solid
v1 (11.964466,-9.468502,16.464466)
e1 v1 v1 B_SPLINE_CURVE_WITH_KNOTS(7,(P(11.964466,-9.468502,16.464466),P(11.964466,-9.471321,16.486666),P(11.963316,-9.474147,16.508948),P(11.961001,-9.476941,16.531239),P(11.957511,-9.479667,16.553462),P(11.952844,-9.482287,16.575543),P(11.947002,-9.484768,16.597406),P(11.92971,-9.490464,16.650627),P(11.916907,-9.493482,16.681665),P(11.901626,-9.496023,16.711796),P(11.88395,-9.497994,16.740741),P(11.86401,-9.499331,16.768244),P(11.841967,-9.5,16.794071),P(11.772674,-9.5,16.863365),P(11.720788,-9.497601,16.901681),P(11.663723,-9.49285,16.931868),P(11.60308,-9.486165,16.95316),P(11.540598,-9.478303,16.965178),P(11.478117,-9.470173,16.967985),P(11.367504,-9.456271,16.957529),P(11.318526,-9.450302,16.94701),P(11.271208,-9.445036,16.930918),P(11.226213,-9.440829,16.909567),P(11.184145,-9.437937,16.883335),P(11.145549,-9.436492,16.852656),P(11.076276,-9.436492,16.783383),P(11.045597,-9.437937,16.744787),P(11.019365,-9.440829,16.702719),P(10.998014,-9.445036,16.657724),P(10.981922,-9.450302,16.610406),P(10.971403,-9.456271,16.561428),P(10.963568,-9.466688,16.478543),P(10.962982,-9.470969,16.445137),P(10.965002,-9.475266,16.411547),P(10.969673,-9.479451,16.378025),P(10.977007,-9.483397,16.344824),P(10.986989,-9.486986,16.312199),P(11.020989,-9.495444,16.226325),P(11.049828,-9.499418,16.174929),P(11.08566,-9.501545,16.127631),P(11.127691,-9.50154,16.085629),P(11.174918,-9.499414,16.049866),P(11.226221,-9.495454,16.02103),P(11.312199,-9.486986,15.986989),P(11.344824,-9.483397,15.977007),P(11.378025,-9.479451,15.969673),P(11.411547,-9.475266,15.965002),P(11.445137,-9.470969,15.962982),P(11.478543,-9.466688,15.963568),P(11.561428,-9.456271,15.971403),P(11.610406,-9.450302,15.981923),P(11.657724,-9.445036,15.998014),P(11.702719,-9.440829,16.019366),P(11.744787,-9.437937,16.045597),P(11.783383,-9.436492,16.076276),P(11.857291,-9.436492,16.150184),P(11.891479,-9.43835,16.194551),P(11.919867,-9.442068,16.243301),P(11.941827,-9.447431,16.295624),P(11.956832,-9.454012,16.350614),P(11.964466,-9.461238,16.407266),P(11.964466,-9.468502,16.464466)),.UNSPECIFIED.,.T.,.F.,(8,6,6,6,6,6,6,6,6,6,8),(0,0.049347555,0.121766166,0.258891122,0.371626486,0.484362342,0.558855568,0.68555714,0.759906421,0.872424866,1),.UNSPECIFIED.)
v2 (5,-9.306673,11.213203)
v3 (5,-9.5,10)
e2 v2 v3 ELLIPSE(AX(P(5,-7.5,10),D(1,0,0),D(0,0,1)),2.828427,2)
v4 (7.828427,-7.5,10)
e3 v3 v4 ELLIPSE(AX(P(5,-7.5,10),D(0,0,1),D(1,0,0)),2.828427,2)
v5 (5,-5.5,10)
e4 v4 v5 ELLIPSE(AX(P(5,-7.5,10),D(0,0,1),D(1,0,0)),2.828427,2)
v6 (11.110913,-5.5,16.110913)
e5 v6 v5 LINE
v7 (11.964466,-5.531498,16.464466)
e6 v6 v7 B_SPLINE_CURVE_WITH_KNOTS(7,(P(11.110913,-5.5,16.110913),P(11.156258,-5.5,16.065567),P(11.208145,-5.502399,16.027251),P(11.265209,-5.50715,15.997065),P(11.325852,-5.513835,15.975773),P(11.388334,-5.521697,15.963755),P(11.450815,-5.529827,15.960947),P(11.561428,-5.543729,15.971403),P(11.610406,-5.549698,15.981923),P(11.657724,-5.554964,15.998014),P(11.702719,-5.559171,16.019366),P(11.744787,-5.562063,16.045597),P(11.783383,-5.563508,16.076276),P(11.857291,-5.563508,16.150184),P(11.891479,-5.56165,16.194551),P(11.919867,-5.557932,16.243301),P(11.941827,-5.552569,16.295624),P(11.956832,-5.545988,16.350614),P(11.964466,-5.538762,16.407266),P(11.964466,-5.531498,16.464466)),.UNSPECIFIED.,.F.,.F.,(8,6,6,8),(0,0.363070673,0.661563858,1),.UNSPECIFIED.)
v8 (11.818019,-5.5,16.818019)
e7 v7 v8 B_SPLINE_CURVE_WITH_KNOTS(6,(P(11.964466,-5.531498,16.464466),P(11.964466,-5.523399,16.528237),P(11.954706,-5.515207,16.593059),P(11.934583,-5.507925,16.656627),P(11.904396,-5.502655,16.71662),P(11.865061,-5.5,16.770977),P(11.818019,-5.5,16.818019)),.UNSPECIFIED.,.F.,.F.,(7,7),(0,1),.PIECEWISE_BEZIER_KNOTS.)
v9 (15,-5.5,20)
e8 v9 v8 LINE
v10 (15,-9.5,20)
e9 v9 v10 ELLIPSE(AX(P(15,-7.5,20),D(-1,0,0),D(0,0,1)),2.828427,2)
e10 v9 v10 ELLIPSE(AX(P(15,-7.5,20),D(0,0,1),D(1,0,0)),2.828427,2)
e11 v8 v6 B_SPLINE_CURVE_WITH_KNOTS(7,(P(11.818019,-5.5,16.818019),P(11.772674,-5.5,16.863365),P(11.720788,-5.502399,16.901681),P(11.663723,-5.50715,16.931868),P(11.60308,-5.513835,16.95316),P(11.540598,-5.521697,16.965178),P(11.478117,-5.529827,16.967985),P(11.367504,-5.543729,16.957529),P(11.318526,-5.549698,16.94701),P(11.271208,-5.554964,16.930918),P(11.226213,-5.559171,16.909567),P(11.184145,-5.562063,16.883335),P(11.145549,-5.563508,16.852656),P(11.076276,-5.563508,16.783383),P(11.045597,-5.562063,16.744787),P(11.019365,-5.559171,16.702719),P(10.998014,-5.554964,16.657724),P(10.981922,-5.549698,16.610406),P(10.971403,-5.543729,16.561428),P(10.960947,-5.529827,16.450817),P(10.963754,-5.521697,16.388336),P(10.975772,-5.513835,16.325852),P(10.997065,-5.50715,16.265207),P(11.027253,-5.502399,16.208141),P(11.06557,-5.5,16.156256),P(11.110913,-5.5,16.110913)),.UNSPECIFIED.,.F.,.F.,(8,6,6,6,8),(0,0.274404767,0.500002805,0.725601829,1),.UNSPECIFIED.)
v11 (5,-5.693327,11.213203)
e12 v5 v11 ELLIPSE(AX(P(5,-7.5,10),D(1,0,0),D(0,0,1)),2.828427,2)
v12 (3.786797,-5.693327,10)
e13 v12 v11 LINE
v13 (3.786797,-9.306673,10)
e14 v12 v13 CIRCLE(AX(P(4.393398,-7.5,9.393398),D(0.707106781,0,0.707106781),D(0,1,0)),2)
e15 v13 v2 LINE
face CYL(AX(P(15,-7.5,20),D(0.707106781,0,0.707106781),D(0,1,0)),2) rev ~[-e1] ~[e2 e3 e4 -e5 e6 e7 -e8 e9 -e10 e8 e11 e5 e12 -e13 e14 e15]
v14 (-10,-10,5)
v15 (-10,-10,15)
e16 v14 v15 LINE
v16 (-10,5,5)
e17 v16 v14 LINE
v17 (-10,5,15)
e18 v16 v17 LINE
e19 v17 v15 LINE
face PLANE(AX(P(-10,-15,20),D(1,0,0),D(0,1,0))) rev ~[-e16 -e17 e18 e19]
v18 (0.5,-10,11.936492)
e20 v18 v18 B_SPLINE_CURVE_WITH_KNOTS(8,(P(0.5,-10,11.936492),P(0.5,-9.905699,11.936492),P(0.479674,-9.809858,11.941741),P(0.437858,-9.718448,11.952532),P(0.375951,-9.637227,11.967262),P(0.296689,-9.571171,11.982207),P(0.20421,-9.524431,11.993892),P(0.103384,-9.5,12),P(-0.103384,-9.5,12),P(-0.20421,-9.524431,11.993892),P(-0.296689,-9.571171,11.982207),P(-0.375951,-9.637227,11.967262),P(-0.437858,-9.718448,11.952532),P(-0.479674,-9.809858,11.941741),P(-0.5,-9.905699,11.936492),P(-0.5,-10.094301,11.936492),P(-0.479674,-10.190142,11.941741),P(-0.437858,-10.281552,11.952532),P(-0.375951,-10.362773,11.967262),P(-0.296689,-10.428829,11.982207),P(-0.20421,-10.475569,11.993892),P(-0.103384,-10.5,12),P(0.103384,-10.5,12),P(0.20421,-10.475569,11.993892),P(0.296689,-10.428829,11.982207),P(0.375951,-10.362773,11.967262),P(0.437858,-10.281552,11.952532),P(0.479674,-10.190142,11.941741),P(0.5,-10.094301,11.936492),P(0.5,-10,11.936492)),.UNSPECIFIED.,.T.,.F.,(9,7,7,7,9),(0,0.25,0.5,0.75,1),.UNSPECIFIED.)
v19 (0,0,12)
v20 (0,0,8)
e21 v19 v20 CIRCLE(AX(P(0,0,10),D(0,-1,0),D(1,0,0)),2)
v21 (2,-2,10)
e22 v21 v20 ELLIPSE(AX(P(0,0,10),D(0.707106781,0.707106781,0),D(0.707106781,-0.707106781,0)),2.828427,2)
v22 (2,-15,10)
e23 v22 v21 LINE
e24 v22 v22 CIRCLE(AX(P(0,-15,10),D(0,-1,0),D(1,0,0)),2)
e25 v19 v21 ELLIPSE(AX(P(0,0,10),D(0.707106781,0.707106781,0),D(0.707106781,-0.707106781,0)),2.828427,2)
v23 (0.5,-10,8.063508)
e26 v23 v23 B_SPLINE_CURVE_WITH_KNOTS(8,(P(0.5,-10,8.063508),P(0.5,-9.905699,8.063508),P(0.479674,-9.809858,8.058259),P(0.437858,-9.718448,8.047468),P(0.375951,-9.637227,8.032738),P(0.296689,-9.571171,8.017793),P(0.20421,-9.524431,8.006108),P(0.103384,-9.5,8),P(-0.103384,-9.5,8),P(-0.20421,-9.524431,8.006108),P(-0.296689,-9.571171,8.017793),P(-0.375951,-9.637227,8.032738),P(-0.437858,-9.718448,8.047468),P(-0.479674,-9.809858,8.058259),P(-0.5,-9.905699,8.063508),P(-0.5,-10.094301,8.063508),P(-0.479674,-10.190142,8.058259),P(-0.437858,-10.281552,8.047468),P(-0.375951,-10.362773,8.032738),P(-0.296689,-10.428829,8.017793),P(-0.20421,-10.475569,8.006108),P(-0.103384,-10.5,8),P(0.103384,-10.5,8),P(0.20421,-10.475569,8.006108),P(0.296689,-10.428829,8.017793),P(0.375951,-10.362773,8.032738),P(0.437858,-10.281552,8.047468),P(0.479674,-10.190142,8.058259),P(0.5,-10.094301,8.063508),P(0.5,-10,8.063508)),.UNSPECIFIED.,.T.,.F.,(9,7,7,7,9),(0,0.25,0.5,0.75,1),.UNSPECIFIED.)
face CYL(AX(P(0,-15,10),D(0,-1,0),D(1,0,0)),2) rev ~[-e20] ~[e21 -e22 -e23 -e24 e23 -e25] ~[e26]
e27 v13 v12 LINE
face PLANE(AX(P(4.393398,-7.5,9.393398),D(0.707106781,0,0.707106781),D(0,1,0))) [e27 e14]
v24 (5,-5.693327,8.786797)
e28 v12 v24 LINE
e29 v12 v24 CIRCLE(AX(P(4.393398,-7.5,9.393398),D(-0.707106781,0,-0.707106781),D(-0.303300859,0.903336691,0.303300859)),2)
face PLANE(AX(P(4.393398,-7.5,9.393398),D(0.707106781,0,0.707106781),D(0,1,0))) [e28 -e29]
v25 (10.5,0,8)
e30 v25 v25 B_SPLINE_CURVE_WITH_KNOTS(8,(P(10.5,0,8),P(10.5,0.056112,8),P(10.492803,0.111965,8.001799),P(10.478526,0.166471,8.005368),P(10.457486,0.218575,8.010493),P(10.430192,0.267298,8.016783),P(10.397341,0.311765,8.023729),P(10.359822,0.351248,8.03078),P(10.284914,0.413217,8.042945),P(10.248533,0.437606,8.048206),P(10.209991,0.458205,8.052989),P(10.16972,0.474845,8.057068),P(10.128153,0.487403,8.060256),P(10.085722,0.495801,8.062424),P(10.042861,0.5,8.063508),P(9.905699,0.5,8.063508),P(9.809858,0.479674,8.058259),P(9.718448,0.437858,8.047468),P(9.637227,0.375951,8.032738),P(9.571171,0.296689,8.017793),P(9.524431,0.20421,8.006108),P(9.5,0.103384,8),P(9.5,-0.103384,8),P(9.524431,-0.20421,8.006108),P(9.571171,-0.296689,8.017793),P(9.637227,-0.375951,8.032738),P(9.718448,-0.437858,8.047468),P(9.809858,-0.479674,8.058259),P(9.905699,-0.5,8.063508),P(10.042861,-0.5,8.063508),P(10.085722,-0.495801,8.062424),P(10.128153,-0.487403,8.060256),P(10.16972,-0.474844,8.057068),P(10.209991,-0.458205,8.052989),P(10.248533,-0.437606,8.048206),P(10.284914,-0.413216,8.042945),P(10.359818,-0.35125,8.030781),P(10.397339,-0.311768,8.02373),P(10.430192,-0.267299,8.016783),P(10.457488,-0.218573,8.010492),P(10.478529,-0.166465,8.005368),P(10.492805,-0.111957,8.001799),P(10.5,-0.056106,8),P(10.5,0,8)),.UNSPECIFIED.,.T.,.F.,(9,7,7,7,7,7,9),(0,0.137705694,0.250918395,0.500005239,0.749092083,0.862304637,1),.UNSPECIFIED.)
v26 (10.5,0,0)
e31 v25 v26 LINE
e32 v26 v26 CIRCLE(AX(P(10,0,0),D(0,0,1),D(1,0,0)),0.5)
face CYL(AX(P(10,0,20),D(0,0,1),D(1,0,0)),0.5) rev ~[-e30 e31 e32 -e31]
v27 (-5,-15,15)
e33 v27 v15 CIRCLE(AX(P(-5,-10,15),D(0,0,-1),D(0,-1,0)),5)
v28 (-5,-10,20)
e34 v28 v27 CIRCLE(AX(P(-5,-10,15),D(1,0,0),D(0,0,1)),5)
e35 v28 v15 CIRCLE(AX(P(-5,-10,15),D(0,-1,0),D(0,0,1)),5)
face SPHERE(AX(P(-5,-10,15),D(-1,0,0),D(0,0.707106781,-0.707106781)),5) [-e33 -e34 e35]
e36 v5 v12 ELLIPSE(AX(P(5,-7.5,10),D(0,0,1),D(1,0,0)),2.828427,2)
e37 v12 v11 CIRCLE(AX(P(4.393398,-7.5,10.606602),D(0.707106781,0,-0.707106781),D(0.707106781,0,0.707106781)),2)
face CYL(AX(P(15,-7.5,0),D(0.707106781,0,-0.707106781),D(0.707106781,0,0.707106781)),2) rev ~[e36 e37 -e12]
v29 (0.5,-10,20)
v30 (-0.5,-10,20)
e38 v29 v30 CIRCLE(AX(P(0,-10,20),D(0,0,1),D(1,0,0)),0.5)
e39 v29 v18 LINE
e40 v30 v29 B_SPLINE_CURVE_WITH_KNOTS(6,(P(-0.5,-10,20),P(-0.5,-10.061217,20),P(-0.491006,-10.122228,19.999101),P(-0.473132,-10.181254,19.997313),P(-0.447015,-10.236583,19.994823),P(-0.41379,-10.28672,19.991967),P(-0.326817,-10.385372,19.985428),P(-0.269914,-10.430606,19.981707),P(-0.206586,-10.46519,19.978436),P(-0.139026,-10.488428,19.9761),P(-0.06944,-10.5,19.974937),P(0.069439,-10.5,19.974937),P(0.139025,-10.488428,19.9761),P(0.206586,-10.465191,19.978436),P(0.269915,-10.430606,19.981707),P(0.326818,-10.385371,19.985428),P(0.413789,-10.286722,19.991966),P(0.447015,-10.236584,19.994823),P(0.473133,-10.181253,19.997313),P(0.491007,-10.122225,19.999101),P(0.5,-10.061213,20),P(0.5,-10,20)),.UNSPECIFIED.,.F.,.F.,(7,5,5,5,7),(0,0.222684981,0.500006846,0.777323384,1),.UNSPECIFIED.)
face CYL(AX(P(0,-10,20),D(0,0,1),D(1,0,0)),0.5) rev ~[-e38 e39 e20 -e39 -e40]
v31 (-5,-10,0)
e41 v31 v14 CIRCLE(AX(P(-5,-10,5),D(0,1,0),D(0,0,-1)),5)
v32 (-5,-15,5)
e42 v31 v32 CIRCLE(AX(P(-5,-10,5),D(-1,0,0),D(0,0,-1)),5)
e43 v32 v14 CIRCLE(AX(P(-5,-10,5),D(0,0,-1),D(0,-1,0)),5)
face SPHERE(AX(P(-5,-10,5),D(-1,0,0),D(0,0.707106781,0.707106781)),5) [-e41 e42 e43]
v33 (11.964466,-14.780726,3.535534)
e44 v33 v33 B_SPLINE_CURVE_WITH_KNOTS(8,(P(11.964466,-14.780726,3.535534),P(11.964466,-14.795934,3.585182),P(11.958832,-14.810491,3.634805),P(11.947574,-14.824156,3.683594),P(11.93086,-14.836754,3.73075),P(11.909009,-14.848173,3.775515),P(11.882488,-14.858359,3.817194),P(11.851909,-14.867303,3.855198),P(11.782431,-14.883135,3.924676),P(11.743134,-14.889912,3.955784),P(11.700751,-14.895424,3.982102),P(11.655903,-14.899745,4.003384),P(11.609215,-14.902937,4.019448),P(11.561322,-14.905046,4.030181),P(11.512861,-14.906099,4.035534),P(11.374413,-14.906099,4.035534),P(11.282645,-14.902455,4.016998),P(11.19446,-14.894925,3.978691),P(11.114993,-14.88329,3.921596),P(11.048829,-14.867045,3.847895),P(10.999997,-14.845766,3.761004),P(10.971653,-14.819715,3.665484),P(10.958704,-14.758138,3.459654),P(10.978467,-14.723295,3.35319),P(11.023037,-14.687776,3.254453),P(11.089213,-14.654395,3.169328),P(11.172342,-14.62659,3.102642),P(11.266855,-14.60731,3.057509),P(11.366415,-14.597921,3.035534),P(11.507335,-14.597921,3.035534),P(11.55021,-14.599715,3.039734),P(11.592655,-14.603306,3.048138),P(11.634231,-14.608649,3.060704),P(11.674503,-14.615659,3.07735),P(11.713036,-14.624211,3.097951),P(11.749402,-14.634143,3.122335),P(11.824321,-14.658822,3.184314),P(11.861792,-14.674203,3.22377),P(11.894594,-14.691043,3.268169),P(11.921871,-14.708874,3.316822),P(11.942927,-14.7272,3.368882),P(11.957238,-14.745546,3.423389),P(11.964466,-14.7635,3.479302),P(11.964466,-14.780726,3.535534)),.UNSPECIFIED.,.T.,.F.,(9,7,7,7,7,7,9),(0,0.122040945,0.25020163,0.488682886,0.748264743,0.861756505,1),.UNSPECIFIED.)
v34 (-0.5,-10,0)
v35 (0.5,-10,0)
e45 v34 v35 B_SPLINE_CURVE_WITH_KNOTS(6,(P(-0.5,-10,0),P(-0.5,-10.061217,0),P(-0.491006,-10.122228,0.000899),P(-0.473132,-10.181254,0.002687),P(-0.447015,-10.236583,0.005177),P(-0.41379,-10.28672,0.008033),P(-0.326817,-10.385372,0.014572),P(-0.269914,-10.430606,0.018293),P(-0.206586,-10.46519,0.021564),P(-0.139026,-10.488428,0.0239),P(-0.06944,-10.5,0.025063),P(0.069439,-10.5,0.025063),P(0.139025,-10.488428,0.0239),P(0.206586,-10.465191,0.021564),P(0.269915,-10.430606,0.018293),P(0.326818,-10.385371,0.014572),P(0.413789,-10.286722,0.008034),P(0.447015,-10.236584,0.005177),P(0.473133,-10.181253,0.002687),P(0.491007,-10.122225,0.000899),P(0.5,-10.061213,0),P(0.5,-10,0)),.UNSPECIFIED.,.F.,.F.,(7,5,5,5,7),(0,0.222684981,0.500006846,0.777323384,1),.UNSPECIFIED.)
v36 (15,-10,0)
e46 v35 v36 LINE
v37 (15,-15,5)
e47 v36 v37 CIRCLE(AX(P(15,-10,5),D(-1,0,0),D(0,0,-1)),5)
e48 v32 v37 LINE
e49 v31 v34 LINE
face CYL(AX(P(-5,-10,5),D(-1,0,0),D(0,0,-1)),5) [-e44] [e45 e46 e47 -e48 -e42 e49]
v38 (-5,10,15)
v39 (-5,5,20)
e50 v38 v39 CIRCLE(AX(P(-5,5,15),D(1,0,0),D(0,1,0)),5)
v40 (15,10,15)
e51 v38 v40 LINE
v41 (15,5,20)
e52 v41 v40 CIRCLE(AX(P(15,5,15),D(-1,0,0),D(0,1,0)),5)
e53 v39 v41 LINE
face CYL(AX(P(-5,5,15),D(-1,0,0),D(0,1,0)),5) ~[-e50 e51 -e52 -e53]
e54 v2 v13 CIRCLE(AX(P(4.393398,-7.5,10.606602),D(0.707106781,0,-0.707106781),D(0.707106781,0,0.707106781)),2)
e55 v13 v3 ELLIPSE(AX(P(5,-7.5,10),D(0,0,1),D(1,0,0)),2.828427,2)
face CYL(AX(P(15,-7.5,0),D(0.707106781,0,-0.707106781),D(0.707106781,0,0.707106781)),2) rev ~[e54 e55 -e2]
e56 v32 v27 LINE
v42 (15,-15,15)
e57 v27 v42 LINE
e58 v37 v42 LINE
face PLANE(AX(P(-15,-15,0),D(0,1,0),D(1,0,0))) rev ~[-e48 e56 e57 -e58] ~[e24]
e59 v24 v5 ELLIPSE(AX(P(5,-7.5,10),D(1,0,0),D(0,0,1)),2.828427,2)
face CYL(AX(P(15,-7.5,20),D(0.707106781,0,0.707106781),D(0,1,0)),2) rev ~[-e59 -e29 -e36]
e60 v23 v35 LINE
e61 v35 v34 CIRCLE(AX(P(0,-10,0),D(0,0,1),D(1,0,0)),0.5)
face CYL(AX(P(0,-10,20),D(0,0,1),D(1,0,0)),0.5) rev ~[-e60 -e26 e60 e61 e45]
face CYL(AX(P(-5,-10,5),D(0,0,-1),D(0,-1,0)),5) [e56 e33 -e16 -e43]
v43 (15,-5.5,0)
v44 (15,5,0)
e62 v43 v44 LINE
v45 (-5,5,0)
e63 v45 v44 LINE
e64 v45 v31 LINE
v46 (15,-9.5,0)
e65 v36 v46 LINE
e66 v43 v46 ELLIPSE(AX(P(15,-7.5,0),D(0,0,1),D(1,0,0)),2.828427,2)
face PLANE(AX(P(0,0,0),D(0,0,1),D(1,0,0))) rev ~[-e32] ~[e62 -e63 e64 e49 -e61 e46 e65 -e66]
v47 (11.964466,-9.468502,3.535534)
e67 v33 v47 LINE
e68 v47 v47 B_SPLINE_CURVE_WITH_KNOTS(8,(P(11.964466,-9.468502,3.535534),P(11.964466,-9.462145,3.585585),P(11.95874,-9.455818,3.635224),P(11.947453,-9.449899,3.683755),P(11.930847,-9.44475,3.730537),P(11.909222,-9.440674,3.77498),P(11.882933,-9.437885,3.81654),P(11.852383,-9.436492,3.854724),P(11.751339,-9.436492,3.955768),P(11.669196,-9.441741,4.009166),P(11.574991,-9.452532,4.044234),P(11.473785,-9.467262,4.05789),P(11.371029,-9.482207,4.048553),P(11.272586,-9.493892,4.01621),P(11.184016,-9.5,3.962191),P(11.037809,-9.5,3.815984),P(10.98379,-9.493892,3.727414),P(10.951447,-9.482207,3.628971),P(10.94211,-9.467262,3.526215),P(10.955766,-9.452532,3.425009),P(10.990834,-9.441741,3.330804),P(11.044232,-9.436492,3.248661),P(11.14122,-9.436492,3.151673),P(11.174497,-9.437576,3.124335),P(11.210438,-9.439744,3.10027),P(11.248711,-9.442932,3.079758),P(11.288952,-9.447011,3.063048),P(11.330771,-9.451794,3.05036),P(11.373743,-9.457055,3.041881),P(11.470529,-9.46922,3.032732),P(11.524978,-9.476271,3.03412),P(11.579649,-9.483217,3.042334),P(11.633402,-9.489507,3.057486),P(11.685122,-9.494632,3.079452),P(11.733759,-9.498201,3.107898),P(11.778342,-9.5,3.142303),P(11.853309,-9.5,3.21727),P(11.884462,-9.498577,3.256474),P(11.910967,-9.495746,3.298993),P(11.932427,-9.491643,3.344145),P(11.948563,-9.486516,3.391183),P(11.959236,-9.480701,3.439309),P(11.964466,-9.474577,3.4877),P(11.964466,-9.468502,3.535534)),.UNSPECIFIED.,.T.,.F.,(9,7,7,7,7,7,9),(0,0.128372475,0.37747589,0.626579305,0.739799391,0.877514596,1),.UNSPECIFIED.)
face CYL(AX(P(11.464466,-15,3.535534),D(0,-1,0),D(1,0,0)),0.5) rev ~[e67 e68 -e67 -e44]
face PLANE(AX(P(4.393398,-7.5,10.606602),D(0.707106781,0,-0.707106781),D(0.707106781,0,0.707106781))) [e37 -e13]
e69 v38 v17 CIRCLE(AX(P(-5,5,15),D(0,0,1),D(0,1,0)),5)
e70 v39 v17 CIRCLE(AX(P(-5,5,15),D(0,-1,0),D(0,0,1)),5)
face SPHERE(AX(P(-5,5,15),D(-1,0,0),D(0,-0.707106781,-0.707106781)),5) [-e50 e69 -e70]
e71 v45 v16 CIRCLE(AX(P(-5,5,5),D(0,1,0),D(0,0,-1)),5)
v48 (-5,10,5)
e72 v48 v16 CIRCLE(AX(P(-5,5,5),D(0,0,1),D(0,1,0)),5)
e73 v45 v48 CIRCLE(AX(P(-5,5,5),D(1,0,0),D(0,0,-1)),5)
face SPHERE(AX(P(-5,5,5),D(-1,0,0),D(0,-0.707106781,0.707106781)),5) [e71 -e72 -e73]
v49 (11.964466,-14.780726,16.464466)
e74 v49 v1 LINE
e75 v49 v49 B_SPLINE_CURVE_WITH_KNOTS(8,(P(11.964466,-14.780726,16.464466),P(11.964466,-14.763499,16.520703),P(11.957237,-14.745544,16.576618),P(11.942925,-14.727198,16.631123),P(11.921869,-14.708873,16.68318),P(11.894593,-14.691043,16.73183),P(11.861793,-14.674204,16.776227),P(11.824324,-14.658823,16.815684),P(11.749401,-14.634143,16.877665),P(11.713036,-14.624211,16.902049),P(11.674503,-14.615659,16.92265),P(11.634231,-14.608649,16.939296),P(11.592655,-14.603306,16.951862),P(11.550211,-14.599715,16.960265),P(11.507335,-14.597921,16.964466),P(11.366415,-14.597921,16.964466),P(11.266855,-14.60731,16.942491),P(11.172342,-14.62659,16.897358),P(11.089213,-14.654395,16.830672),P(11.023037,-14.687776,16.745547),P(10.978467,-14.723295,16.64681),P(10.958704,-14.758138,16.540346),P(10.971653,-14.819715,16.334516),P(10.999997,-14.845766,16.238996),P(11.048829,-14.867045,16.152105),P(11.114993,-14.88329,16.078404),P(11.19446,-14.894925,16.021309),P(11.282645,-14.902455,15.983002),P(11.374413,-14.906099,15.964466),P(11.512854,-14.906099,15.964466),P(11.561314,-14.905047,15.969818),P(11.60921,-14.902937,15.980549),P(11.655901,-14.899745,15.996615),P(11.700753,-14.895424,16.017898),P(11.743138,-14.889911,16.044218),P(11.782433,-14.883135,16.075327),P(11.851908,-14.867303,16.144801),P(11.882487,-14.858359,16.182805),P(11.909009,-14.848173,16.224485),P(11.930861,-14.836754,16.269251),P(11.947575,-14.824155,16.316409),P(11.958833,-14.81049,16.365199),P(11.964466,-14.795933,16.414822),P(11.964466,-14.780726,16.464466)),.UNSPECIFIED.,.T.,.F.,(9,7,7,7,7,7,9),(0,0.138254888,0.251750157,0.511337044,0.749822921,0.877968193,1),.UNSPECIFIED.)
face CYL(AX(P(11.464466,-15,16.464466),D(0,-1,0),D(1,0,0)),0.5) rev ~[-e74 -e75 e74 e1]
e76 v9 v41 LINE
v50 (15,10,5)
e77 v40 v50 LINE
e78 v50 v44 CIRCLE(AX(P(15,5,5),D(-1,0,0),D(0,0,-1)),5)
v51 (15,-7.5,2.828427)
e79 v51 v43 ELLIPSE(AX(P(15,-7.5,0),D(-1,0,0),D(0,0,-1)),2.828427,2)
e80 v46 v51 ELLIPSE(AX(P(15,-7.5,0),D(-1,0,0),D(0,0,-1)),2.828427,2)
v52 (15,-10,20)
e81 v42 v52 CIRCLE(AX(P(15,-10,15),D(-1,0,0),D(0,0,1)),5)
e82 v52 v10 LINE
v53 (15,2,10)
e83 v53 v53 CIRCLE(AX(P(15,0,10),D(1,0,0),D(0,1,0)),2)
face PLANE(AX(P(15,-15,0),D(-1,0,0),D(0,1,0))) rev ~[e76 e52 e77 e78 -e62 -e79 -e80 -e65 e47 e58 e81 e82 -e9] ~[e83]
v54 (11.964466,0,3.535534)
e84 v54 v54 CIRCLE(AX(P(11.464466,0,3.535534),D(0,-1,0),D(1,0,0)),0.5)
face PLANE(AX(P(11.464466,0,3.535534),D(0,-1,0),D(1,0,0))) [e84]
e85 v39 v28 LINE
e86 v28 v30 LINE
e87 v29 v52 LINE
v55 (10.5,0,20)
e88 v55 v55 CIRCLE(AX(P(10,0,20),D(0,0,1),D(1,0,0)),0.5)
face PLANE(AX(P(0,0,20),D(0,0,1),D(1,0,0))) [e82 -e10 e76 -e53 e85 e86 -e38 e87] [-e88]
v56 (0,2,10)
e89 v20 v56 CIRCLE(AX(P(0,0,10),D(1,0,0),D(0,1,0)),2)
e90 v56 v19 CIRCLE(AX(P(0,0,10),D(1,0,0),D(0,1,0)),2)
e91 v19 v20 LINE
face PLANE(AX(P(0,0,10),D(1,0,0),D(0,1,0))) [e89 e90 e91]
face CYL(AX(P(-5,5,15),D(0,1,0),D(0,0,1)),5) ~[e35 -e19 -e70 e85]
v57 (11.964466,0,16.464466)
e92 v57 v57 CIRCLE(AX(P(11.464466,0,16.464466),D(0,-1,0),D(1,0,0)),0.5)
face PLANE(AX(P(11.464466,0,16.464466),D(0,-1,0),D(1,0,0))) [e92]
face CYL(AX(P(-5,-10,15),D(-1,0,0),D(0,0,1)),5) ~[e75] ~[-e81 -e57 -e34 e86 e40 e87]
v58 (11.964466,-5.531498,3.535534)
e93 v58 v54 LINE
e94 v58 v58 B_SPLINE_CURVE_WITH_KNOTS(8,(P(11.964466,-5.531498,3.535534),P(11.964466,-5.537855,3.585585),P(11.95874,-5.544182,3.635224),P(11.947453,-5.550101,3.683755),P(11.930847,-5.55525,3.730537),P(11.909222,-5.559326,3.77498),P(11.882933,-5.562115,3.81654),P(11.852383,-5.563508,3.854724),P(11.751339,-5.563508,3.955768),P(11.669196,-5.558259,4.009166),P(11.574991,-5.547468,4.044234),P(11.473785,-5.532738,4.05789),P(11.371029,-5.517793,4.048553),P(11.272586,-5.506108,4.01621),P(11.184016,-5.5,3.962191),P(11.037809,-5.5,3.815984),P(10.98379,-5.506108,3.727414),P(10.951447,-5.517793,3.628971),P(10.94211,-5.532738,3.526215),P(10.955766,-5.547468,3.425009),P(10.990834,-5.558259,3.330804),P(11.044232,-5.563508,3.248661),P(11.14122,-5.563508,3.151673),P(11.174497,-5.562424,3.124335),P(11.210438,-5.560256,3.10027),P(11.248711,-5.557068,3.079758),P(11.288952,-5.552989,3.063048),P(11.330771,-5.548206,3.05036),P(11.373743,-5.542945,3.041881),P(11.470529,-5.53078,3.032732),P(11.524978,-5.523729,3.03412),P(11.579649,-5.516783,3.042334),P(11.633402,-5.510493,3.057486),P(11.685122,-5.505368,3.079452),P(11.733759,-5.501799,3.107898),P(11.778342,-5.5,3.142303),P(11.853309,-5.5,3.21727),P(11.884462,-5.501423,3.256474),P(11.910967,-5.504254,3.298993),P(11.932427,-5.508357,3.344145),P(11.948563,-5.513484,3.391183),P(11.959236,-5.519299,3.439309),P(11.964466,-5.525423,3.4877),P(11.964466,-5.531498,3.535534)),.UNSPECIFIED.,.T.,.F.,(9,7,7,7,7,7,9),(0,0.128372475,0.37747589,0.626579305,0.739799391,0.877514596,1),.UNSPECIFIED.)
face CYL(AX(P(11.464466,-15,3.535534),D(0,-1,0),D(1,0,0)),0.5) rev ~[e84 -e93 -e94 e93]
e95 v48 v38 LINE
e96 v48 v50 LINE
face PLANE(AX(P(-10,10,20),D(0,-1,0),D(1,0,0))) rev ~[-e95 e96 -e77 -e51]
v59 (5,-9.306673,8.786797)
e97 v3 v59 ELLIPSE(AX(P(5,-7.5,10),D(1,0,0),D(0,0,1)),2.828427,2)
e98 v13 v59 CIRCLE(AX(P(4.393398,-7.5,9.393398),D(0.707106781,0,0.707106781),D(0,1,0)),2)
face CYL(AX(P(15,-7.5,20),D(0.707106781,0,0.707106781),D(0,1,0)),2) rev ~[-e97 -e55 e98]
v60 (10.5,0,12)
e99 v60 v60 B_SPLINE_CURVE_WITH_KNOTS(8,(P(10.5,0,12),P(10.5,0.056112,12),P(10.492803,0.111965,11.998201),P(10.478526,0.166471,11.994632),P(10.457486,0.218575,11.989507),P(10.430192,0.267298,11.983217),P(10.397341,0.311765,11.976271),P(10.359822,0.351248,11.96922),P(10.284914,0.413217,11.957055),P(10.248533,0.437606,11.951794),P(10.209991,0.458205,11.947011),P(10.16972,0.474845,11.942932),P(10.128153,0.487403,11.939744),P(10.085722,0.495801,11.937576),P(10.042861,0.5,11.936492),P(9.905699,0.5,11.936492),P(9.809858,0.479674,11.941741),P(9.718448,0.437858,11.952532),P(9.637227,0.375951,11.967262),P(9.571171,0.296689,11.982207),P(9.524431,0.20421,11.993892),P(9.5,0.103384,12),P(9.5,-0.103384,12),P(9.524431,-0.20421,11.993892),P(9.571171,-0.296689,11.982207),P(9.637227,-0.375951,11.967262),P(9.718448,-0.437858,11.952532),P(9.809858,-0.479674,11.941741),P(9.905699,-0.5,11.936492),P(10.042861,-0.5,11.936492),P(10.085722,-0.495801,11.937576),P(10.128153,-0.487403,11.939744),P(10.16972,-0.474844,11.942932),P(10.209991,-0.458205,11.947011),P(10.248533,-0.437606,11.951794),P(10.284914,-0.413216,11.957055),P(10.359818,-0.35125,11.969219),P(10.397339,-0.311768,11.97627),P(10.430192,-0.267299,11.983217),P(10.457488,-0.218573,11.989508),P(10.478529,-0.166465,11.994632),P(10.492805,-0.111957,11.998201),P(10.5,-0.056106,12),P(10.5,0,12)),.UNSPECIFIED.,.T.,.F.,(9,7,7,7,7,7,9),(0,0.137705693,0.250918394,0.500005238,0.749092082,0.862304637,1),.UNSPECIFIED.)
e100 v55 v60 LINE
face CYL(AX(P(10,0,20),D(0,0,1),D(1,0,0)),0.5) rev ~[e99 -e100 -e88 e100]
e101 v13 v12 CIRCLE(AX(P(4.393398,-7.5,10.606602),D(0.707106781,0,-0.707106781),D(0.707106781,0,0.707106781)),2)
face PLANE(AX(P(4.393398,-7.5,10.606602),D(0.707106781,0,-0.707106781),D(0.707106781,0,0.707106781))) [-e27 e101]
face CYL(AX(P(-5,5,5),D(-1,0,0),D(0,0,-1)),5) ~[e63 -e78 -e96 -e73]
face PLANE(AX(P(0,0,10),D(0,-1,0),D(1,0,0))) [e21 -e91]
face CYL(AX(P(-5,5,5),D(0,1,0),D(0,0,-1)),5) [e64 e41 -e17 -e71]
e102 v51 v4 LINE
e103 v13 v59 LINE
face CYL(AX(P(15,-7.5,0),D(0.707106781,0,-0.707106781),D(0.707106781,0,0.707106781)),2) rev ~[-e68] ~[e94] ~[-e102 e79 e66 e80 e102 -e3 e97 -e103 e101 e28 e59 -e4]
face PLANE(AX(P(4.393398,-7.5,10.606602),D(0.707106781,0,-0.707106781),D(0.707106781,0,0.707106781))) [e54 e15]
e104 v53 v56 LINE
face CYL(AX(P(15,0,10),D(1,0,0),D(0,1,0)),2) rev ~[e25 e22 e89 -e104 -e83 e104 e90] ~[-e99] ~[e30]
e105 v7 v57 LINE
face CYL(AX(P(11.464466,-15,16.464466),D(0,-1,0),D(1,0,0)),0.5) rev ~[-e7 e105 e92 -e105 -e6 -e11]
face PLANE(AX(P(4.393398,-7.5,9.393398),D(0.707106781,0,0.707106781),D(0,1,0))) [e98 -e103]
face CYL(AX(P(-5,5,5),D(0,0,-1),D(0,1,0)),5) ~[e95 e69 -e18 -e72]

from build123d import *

# Parameters (mm, degrees)
F0_W          = 30
F0_H          = 30
F1_DEPTH      = 20
F2_R          = 2
F3_DEPTH      = 15
F4_R          = 2
F4_R_2        = 0.5
F5_DEPTH      = 15
F7_R          = 2
F8_DEPTH      = 15
F10_R         = 2
F11_DEPTH     = 15
F12_R         = 0.5
F13_DEPTH     = 20.0010001
F14_T1_DEPTH  = 10
F14_T3_DEPTH  = 32.5
F14_T5_DEPTH  = 15
F14_S9_W      = 5
F14_S9_H      = 5
F14_T10_DEPTH = 5
F14_S15_W     = 5
F14_S15_H     = 5
F14_T16_DEPTH = 5
F14_S21_W     = 5
F14_S21_H     = 5
F14_T22_DEPTH = 5
F14_S27_W     = 5
F14_S27_H     = 5
F14_T28_DEPTH = 5


# Not quite as in the source:
# - a fillet or chamfer that OpenCascade refuses, or shapes differently, is made with other operations: its cross-section is extruded or revolved along the edge and cut away or added


with BuildPart() as f1:
    # F0 (on Top) → F1 (new body)
    with BuildSketch(Plane.XY):
        Rectangle(F0_W, F0_H)
    extrude(amount=F1_DEPTH)

    # F2 (on face) → F3 (cut)
    with BuildSketch(Plane.YZ.offset(15)):
        with Locations((0, 10)):
            Circle(F2_R)
    extrude(amount=-F3_DEPTH, mode=Mode.SUBTRACT)

    # F4 (on face) → F5 (cut)
    with BuildSketch(Plane.XZ.offset(15)):
        with Locations((0, 10)):
            Circle(F4_R)
        with Locations((11.4644660941, 16.4644660941)):
            Circle(F4_R_2)
        with Locations((11.4644660941, 3.5355339059)):
            Circle(F4_R_2)
    extrude(amount=-F5_DEPTH, mode=Mode.SUBTRACT)

    # F7 (on face) → F8 (cut)
    with BuildSketch(Plane(origin=(17.5, 0, 17.5), x_dir=(0, 1, 0), z_dir=(0.7071067812, 0, 0.7071067812))):
        with Locations((-7.5, 3.5355339059)):
            Circle(F7_R)
    extrude(amount=-F8_DEPTH, mode=Mode.SUBTRACT)

    # F10 (on face) → F11 (cut)
    with BuildSketch(Plane(origin=(7.5, 0, -7.5), x_dir=(0.7071067812, 0, 0.7071067812), z_dir=(0.7071067812, 0, -0.7071067812))):
        with Locations((10.6066017178, 7.5)):
            Circle(F10_R)
    extrude(amount=-F11_DEPTH, mode=Mode.SUBTRACT)

    # F12 (on face) → F13 (cut, through all)
    with BuildSketch(Plane.XY.offset(20)):
        Polygon((-60, -15), (-10, -15), (-10, 10), (15, 10), (15, 50), (-60, 50), align=None)
        with Locations((10, 0)):
            Circle(F12_R)
        with Locations((0, -10)):
            Circle(F12_R)
    extrude(amount=-F13_DEPTH, mode=Mode.SUBTRACT)

    # F14: fillet of radius 5 on 8 edges, made by hand

    # F14_s2 → F14_t1 (cut)
    with BuildSketch(Plane.XY.offset(5)):
        with BuildLine():
            ThreePointArc((-5, -15), (-8.5355339059, -13.5355339059), (-10, -10))
            Line((-10, -10), (-10, -15))
            Line((-10, -15), (-5, -15))
        make_face()
        with BuildLine():
            ThreePointArc((-5, 10), (-8.5355339059, 8.5355339059), (-10, 5))
            Line((-10, 5), (-10, 10))
            Line((-10, 10), (-5, 10))
        make_face()
    extrude(amount=F14_T1_DEPTH, mode=Mode.SUBTRACT)

    # F14_s4 → F14_t3 (cut)
    with BuildSketch(Plane.YZ.offset(-5)):
        with BuildLine():
            ThreePointArc((-10, 20), (-13.5355339059, 18.5355339059), (-15, 15))
            Line((-15, 15), (-15, 20))
            Line((-15, 20), (-10, 20))
        make_face()
        with BuildLine():
            ThreePointArc((10, 15), (8.5355339059, 18.5355339059), (5, 20))
            Line((5, 20), (10, 20))
            Line((10, 20), (10, 15))
        make_face()
        with BuildLine():
            ThreePointArc((5, 0), (8.5355339059, 1.4644660941), (10, 5))
            Line((10, 5), (10, 0))
            Line((10, 0), (5, 0))
        make_face()
        with BuildLine():
            ThreePointArc((-10, 0), (-13.5355339059, 1.4644660941), (-15, 5))
            Line((-15, 5), (-15, 0))
            Line((-15, 0), (-10, 0))
        make_face()
    extrude(amount=F14_T3_DEPTH, mode=Mode.SUBTRACT)

    # F14_s6 → F14_t5 (cut)
    with BuildSketch(Plane.XZ.offset(-5)):
        with BuildLine():
            ThreePointArc((-5, 20), (-8.5355339059, 18.5355339059), (-10, 15))
            Line((-10, 15), (-10, 20))
            Line((-10, 20), (-5, 20))
        make_face()
        with BuildLine():
            ThreePointArc((-5, 0), (-8.5355339059, 1.4644660941), (-10, 5))
            Line((-10, 5), (-10, 0))
            Line((-10, 0), (-5, 0))
        make_face()
    extrude(amount=F14_T5_DEPTH, mode=Mode.SUBTRACT)


with BuildPart() as f14_tool8:
    # F14_s9 → F14_t10 (new body)
    with BuildSketch(Plane.YZ.offset(-5)):
        with Locations((-12.5, 17.5)):
            Rectangle(F14_S9_W, F14_S9_H)
    extrude(amount=-F14_T10_DEPTH)

    # F14_s11 → F14_t12 (revolve, cut)
    with BuildSketch(Plane(origin=(-5, -10, 15), x_dir=(0, 0.7071067812, -0.7071067812), z_dir=(0, 0.7071067812, 0.7071067812))):
        with BuildLine():
            ThreePointArc((0, -5), (5, 0), (0, 5))
            Line((0, 5), (0, -5))
        make_face()
    revolve(axis=Axis((-5, -10, 15), (-1, 0, 0)), mode=Mode.SUBTRACT)


with BuildPart() as f1_1:
    add(f1.part)

    # F14_t7: cut F14_tool8
    add(f14_tool8.part, mode=Mode.SUBTRACT)


with BuildPart() as f14_tool14:
    # F14_s15 → F14_t16 (new body)
    with BuildSketch(Plane.YZ.offset(-5)):
        with Locations((-12.5, 2.5)):
            Rectangle(F14_S15_W, F14_S15_H)
    extrude(amount=-F14_T16_DEPTH)

    # F14_s17 → F14_t18 (revolve, cut)
    with BuildSketch(Plane(origin=(-5, -10, 5), x_dir=(0, 0.7071067812, 0.7071067812), z_dir=(0, -0.7071067812, 0.7071067812))):
        with BuildLine():
            ThreePointArc((0, -5), (5, 0), (0, 5))
            Line((0, 5), (0, -5))
        make_face()
    revolve(axis=Axis((-5, -10, 5), (-1, 0, 0)), mode=Mode.SUBTRACT)


with BuildPart() as f1_2:
    add(f1_1.part)

    # F14_t13: cut F14_tool14
    add(f14_tool14.part, mode=Mode.SUBTRACT)


with BuildPart() as f14_tool20:
    # F14_s21 → F14_t22 (new body)
    with BuildSketch(Plane.YZ.offset(-5)):
        with Locations((7.5, 17.5)):
            Rectangle(F14_S21_W, F14_S21_H)
    extrude(amount=-F14_T22_DEPTH)

    # F14_s23 → F14_t24 (revolve, cut)
    with BuildSketch(Plane(origin=(-5, 5, 15), x_dir=(0, -0.7071067812, -0.7071067812), z_dir=(0, 0.7071067812, -0.7071067812))):
        with BuildLine():
            ThreePointArc((0, -5), (5, 0), (0, 5))
            Line((0, 5), (0, -5))
        make_face()
    revolve(axis=Axis((-5, 5, 15), (-1, 0, 0)), mode=Mode.SUBTRACT)


with BuildPart() as f1_3:
    add(f1_2.part)

    # F14_t19: cut F14_tool20
    add(f14_tool20.part, mode=Mode.SUBTRACT)


with BuildPart() as f14_tool26:
    # F14_s27 → F14_t28 (new body)
    with BuildSketch(Plane.YZ.offset(-5)):
        with Locations((7.5, 2.5)):
            Rectangle(F14_S27_W, F14_S27_H)
    extrude(amount=-F14_T28_DEPTH)

    # F14_s29 → F14_t30 (revolve, cut)
    with BuildSketch(Plane(origin=(-5, 5, 5), x_dir=(0, -0.7071067812, 0.7071067812), z_dir=(0, -0.7071067812, -0.7071067812))):
        with BuildLine():
            ThreePointArc((0, -5), (5, 0), (0, 5))
            Line((0, 5), (0, -5))
        make_face()
    revolve(axis=Axis((-5, 5, 5), (-1, 0, 0)), mode=Mode.SUBTRACT)


with BuildPart() as f1_4:
    add(f1_3.part)

    # F14_t25: cut F14_tool26
    add(f14_tool26.part, mode=Mode.SUBTRACT)


solid = f1_4.part
